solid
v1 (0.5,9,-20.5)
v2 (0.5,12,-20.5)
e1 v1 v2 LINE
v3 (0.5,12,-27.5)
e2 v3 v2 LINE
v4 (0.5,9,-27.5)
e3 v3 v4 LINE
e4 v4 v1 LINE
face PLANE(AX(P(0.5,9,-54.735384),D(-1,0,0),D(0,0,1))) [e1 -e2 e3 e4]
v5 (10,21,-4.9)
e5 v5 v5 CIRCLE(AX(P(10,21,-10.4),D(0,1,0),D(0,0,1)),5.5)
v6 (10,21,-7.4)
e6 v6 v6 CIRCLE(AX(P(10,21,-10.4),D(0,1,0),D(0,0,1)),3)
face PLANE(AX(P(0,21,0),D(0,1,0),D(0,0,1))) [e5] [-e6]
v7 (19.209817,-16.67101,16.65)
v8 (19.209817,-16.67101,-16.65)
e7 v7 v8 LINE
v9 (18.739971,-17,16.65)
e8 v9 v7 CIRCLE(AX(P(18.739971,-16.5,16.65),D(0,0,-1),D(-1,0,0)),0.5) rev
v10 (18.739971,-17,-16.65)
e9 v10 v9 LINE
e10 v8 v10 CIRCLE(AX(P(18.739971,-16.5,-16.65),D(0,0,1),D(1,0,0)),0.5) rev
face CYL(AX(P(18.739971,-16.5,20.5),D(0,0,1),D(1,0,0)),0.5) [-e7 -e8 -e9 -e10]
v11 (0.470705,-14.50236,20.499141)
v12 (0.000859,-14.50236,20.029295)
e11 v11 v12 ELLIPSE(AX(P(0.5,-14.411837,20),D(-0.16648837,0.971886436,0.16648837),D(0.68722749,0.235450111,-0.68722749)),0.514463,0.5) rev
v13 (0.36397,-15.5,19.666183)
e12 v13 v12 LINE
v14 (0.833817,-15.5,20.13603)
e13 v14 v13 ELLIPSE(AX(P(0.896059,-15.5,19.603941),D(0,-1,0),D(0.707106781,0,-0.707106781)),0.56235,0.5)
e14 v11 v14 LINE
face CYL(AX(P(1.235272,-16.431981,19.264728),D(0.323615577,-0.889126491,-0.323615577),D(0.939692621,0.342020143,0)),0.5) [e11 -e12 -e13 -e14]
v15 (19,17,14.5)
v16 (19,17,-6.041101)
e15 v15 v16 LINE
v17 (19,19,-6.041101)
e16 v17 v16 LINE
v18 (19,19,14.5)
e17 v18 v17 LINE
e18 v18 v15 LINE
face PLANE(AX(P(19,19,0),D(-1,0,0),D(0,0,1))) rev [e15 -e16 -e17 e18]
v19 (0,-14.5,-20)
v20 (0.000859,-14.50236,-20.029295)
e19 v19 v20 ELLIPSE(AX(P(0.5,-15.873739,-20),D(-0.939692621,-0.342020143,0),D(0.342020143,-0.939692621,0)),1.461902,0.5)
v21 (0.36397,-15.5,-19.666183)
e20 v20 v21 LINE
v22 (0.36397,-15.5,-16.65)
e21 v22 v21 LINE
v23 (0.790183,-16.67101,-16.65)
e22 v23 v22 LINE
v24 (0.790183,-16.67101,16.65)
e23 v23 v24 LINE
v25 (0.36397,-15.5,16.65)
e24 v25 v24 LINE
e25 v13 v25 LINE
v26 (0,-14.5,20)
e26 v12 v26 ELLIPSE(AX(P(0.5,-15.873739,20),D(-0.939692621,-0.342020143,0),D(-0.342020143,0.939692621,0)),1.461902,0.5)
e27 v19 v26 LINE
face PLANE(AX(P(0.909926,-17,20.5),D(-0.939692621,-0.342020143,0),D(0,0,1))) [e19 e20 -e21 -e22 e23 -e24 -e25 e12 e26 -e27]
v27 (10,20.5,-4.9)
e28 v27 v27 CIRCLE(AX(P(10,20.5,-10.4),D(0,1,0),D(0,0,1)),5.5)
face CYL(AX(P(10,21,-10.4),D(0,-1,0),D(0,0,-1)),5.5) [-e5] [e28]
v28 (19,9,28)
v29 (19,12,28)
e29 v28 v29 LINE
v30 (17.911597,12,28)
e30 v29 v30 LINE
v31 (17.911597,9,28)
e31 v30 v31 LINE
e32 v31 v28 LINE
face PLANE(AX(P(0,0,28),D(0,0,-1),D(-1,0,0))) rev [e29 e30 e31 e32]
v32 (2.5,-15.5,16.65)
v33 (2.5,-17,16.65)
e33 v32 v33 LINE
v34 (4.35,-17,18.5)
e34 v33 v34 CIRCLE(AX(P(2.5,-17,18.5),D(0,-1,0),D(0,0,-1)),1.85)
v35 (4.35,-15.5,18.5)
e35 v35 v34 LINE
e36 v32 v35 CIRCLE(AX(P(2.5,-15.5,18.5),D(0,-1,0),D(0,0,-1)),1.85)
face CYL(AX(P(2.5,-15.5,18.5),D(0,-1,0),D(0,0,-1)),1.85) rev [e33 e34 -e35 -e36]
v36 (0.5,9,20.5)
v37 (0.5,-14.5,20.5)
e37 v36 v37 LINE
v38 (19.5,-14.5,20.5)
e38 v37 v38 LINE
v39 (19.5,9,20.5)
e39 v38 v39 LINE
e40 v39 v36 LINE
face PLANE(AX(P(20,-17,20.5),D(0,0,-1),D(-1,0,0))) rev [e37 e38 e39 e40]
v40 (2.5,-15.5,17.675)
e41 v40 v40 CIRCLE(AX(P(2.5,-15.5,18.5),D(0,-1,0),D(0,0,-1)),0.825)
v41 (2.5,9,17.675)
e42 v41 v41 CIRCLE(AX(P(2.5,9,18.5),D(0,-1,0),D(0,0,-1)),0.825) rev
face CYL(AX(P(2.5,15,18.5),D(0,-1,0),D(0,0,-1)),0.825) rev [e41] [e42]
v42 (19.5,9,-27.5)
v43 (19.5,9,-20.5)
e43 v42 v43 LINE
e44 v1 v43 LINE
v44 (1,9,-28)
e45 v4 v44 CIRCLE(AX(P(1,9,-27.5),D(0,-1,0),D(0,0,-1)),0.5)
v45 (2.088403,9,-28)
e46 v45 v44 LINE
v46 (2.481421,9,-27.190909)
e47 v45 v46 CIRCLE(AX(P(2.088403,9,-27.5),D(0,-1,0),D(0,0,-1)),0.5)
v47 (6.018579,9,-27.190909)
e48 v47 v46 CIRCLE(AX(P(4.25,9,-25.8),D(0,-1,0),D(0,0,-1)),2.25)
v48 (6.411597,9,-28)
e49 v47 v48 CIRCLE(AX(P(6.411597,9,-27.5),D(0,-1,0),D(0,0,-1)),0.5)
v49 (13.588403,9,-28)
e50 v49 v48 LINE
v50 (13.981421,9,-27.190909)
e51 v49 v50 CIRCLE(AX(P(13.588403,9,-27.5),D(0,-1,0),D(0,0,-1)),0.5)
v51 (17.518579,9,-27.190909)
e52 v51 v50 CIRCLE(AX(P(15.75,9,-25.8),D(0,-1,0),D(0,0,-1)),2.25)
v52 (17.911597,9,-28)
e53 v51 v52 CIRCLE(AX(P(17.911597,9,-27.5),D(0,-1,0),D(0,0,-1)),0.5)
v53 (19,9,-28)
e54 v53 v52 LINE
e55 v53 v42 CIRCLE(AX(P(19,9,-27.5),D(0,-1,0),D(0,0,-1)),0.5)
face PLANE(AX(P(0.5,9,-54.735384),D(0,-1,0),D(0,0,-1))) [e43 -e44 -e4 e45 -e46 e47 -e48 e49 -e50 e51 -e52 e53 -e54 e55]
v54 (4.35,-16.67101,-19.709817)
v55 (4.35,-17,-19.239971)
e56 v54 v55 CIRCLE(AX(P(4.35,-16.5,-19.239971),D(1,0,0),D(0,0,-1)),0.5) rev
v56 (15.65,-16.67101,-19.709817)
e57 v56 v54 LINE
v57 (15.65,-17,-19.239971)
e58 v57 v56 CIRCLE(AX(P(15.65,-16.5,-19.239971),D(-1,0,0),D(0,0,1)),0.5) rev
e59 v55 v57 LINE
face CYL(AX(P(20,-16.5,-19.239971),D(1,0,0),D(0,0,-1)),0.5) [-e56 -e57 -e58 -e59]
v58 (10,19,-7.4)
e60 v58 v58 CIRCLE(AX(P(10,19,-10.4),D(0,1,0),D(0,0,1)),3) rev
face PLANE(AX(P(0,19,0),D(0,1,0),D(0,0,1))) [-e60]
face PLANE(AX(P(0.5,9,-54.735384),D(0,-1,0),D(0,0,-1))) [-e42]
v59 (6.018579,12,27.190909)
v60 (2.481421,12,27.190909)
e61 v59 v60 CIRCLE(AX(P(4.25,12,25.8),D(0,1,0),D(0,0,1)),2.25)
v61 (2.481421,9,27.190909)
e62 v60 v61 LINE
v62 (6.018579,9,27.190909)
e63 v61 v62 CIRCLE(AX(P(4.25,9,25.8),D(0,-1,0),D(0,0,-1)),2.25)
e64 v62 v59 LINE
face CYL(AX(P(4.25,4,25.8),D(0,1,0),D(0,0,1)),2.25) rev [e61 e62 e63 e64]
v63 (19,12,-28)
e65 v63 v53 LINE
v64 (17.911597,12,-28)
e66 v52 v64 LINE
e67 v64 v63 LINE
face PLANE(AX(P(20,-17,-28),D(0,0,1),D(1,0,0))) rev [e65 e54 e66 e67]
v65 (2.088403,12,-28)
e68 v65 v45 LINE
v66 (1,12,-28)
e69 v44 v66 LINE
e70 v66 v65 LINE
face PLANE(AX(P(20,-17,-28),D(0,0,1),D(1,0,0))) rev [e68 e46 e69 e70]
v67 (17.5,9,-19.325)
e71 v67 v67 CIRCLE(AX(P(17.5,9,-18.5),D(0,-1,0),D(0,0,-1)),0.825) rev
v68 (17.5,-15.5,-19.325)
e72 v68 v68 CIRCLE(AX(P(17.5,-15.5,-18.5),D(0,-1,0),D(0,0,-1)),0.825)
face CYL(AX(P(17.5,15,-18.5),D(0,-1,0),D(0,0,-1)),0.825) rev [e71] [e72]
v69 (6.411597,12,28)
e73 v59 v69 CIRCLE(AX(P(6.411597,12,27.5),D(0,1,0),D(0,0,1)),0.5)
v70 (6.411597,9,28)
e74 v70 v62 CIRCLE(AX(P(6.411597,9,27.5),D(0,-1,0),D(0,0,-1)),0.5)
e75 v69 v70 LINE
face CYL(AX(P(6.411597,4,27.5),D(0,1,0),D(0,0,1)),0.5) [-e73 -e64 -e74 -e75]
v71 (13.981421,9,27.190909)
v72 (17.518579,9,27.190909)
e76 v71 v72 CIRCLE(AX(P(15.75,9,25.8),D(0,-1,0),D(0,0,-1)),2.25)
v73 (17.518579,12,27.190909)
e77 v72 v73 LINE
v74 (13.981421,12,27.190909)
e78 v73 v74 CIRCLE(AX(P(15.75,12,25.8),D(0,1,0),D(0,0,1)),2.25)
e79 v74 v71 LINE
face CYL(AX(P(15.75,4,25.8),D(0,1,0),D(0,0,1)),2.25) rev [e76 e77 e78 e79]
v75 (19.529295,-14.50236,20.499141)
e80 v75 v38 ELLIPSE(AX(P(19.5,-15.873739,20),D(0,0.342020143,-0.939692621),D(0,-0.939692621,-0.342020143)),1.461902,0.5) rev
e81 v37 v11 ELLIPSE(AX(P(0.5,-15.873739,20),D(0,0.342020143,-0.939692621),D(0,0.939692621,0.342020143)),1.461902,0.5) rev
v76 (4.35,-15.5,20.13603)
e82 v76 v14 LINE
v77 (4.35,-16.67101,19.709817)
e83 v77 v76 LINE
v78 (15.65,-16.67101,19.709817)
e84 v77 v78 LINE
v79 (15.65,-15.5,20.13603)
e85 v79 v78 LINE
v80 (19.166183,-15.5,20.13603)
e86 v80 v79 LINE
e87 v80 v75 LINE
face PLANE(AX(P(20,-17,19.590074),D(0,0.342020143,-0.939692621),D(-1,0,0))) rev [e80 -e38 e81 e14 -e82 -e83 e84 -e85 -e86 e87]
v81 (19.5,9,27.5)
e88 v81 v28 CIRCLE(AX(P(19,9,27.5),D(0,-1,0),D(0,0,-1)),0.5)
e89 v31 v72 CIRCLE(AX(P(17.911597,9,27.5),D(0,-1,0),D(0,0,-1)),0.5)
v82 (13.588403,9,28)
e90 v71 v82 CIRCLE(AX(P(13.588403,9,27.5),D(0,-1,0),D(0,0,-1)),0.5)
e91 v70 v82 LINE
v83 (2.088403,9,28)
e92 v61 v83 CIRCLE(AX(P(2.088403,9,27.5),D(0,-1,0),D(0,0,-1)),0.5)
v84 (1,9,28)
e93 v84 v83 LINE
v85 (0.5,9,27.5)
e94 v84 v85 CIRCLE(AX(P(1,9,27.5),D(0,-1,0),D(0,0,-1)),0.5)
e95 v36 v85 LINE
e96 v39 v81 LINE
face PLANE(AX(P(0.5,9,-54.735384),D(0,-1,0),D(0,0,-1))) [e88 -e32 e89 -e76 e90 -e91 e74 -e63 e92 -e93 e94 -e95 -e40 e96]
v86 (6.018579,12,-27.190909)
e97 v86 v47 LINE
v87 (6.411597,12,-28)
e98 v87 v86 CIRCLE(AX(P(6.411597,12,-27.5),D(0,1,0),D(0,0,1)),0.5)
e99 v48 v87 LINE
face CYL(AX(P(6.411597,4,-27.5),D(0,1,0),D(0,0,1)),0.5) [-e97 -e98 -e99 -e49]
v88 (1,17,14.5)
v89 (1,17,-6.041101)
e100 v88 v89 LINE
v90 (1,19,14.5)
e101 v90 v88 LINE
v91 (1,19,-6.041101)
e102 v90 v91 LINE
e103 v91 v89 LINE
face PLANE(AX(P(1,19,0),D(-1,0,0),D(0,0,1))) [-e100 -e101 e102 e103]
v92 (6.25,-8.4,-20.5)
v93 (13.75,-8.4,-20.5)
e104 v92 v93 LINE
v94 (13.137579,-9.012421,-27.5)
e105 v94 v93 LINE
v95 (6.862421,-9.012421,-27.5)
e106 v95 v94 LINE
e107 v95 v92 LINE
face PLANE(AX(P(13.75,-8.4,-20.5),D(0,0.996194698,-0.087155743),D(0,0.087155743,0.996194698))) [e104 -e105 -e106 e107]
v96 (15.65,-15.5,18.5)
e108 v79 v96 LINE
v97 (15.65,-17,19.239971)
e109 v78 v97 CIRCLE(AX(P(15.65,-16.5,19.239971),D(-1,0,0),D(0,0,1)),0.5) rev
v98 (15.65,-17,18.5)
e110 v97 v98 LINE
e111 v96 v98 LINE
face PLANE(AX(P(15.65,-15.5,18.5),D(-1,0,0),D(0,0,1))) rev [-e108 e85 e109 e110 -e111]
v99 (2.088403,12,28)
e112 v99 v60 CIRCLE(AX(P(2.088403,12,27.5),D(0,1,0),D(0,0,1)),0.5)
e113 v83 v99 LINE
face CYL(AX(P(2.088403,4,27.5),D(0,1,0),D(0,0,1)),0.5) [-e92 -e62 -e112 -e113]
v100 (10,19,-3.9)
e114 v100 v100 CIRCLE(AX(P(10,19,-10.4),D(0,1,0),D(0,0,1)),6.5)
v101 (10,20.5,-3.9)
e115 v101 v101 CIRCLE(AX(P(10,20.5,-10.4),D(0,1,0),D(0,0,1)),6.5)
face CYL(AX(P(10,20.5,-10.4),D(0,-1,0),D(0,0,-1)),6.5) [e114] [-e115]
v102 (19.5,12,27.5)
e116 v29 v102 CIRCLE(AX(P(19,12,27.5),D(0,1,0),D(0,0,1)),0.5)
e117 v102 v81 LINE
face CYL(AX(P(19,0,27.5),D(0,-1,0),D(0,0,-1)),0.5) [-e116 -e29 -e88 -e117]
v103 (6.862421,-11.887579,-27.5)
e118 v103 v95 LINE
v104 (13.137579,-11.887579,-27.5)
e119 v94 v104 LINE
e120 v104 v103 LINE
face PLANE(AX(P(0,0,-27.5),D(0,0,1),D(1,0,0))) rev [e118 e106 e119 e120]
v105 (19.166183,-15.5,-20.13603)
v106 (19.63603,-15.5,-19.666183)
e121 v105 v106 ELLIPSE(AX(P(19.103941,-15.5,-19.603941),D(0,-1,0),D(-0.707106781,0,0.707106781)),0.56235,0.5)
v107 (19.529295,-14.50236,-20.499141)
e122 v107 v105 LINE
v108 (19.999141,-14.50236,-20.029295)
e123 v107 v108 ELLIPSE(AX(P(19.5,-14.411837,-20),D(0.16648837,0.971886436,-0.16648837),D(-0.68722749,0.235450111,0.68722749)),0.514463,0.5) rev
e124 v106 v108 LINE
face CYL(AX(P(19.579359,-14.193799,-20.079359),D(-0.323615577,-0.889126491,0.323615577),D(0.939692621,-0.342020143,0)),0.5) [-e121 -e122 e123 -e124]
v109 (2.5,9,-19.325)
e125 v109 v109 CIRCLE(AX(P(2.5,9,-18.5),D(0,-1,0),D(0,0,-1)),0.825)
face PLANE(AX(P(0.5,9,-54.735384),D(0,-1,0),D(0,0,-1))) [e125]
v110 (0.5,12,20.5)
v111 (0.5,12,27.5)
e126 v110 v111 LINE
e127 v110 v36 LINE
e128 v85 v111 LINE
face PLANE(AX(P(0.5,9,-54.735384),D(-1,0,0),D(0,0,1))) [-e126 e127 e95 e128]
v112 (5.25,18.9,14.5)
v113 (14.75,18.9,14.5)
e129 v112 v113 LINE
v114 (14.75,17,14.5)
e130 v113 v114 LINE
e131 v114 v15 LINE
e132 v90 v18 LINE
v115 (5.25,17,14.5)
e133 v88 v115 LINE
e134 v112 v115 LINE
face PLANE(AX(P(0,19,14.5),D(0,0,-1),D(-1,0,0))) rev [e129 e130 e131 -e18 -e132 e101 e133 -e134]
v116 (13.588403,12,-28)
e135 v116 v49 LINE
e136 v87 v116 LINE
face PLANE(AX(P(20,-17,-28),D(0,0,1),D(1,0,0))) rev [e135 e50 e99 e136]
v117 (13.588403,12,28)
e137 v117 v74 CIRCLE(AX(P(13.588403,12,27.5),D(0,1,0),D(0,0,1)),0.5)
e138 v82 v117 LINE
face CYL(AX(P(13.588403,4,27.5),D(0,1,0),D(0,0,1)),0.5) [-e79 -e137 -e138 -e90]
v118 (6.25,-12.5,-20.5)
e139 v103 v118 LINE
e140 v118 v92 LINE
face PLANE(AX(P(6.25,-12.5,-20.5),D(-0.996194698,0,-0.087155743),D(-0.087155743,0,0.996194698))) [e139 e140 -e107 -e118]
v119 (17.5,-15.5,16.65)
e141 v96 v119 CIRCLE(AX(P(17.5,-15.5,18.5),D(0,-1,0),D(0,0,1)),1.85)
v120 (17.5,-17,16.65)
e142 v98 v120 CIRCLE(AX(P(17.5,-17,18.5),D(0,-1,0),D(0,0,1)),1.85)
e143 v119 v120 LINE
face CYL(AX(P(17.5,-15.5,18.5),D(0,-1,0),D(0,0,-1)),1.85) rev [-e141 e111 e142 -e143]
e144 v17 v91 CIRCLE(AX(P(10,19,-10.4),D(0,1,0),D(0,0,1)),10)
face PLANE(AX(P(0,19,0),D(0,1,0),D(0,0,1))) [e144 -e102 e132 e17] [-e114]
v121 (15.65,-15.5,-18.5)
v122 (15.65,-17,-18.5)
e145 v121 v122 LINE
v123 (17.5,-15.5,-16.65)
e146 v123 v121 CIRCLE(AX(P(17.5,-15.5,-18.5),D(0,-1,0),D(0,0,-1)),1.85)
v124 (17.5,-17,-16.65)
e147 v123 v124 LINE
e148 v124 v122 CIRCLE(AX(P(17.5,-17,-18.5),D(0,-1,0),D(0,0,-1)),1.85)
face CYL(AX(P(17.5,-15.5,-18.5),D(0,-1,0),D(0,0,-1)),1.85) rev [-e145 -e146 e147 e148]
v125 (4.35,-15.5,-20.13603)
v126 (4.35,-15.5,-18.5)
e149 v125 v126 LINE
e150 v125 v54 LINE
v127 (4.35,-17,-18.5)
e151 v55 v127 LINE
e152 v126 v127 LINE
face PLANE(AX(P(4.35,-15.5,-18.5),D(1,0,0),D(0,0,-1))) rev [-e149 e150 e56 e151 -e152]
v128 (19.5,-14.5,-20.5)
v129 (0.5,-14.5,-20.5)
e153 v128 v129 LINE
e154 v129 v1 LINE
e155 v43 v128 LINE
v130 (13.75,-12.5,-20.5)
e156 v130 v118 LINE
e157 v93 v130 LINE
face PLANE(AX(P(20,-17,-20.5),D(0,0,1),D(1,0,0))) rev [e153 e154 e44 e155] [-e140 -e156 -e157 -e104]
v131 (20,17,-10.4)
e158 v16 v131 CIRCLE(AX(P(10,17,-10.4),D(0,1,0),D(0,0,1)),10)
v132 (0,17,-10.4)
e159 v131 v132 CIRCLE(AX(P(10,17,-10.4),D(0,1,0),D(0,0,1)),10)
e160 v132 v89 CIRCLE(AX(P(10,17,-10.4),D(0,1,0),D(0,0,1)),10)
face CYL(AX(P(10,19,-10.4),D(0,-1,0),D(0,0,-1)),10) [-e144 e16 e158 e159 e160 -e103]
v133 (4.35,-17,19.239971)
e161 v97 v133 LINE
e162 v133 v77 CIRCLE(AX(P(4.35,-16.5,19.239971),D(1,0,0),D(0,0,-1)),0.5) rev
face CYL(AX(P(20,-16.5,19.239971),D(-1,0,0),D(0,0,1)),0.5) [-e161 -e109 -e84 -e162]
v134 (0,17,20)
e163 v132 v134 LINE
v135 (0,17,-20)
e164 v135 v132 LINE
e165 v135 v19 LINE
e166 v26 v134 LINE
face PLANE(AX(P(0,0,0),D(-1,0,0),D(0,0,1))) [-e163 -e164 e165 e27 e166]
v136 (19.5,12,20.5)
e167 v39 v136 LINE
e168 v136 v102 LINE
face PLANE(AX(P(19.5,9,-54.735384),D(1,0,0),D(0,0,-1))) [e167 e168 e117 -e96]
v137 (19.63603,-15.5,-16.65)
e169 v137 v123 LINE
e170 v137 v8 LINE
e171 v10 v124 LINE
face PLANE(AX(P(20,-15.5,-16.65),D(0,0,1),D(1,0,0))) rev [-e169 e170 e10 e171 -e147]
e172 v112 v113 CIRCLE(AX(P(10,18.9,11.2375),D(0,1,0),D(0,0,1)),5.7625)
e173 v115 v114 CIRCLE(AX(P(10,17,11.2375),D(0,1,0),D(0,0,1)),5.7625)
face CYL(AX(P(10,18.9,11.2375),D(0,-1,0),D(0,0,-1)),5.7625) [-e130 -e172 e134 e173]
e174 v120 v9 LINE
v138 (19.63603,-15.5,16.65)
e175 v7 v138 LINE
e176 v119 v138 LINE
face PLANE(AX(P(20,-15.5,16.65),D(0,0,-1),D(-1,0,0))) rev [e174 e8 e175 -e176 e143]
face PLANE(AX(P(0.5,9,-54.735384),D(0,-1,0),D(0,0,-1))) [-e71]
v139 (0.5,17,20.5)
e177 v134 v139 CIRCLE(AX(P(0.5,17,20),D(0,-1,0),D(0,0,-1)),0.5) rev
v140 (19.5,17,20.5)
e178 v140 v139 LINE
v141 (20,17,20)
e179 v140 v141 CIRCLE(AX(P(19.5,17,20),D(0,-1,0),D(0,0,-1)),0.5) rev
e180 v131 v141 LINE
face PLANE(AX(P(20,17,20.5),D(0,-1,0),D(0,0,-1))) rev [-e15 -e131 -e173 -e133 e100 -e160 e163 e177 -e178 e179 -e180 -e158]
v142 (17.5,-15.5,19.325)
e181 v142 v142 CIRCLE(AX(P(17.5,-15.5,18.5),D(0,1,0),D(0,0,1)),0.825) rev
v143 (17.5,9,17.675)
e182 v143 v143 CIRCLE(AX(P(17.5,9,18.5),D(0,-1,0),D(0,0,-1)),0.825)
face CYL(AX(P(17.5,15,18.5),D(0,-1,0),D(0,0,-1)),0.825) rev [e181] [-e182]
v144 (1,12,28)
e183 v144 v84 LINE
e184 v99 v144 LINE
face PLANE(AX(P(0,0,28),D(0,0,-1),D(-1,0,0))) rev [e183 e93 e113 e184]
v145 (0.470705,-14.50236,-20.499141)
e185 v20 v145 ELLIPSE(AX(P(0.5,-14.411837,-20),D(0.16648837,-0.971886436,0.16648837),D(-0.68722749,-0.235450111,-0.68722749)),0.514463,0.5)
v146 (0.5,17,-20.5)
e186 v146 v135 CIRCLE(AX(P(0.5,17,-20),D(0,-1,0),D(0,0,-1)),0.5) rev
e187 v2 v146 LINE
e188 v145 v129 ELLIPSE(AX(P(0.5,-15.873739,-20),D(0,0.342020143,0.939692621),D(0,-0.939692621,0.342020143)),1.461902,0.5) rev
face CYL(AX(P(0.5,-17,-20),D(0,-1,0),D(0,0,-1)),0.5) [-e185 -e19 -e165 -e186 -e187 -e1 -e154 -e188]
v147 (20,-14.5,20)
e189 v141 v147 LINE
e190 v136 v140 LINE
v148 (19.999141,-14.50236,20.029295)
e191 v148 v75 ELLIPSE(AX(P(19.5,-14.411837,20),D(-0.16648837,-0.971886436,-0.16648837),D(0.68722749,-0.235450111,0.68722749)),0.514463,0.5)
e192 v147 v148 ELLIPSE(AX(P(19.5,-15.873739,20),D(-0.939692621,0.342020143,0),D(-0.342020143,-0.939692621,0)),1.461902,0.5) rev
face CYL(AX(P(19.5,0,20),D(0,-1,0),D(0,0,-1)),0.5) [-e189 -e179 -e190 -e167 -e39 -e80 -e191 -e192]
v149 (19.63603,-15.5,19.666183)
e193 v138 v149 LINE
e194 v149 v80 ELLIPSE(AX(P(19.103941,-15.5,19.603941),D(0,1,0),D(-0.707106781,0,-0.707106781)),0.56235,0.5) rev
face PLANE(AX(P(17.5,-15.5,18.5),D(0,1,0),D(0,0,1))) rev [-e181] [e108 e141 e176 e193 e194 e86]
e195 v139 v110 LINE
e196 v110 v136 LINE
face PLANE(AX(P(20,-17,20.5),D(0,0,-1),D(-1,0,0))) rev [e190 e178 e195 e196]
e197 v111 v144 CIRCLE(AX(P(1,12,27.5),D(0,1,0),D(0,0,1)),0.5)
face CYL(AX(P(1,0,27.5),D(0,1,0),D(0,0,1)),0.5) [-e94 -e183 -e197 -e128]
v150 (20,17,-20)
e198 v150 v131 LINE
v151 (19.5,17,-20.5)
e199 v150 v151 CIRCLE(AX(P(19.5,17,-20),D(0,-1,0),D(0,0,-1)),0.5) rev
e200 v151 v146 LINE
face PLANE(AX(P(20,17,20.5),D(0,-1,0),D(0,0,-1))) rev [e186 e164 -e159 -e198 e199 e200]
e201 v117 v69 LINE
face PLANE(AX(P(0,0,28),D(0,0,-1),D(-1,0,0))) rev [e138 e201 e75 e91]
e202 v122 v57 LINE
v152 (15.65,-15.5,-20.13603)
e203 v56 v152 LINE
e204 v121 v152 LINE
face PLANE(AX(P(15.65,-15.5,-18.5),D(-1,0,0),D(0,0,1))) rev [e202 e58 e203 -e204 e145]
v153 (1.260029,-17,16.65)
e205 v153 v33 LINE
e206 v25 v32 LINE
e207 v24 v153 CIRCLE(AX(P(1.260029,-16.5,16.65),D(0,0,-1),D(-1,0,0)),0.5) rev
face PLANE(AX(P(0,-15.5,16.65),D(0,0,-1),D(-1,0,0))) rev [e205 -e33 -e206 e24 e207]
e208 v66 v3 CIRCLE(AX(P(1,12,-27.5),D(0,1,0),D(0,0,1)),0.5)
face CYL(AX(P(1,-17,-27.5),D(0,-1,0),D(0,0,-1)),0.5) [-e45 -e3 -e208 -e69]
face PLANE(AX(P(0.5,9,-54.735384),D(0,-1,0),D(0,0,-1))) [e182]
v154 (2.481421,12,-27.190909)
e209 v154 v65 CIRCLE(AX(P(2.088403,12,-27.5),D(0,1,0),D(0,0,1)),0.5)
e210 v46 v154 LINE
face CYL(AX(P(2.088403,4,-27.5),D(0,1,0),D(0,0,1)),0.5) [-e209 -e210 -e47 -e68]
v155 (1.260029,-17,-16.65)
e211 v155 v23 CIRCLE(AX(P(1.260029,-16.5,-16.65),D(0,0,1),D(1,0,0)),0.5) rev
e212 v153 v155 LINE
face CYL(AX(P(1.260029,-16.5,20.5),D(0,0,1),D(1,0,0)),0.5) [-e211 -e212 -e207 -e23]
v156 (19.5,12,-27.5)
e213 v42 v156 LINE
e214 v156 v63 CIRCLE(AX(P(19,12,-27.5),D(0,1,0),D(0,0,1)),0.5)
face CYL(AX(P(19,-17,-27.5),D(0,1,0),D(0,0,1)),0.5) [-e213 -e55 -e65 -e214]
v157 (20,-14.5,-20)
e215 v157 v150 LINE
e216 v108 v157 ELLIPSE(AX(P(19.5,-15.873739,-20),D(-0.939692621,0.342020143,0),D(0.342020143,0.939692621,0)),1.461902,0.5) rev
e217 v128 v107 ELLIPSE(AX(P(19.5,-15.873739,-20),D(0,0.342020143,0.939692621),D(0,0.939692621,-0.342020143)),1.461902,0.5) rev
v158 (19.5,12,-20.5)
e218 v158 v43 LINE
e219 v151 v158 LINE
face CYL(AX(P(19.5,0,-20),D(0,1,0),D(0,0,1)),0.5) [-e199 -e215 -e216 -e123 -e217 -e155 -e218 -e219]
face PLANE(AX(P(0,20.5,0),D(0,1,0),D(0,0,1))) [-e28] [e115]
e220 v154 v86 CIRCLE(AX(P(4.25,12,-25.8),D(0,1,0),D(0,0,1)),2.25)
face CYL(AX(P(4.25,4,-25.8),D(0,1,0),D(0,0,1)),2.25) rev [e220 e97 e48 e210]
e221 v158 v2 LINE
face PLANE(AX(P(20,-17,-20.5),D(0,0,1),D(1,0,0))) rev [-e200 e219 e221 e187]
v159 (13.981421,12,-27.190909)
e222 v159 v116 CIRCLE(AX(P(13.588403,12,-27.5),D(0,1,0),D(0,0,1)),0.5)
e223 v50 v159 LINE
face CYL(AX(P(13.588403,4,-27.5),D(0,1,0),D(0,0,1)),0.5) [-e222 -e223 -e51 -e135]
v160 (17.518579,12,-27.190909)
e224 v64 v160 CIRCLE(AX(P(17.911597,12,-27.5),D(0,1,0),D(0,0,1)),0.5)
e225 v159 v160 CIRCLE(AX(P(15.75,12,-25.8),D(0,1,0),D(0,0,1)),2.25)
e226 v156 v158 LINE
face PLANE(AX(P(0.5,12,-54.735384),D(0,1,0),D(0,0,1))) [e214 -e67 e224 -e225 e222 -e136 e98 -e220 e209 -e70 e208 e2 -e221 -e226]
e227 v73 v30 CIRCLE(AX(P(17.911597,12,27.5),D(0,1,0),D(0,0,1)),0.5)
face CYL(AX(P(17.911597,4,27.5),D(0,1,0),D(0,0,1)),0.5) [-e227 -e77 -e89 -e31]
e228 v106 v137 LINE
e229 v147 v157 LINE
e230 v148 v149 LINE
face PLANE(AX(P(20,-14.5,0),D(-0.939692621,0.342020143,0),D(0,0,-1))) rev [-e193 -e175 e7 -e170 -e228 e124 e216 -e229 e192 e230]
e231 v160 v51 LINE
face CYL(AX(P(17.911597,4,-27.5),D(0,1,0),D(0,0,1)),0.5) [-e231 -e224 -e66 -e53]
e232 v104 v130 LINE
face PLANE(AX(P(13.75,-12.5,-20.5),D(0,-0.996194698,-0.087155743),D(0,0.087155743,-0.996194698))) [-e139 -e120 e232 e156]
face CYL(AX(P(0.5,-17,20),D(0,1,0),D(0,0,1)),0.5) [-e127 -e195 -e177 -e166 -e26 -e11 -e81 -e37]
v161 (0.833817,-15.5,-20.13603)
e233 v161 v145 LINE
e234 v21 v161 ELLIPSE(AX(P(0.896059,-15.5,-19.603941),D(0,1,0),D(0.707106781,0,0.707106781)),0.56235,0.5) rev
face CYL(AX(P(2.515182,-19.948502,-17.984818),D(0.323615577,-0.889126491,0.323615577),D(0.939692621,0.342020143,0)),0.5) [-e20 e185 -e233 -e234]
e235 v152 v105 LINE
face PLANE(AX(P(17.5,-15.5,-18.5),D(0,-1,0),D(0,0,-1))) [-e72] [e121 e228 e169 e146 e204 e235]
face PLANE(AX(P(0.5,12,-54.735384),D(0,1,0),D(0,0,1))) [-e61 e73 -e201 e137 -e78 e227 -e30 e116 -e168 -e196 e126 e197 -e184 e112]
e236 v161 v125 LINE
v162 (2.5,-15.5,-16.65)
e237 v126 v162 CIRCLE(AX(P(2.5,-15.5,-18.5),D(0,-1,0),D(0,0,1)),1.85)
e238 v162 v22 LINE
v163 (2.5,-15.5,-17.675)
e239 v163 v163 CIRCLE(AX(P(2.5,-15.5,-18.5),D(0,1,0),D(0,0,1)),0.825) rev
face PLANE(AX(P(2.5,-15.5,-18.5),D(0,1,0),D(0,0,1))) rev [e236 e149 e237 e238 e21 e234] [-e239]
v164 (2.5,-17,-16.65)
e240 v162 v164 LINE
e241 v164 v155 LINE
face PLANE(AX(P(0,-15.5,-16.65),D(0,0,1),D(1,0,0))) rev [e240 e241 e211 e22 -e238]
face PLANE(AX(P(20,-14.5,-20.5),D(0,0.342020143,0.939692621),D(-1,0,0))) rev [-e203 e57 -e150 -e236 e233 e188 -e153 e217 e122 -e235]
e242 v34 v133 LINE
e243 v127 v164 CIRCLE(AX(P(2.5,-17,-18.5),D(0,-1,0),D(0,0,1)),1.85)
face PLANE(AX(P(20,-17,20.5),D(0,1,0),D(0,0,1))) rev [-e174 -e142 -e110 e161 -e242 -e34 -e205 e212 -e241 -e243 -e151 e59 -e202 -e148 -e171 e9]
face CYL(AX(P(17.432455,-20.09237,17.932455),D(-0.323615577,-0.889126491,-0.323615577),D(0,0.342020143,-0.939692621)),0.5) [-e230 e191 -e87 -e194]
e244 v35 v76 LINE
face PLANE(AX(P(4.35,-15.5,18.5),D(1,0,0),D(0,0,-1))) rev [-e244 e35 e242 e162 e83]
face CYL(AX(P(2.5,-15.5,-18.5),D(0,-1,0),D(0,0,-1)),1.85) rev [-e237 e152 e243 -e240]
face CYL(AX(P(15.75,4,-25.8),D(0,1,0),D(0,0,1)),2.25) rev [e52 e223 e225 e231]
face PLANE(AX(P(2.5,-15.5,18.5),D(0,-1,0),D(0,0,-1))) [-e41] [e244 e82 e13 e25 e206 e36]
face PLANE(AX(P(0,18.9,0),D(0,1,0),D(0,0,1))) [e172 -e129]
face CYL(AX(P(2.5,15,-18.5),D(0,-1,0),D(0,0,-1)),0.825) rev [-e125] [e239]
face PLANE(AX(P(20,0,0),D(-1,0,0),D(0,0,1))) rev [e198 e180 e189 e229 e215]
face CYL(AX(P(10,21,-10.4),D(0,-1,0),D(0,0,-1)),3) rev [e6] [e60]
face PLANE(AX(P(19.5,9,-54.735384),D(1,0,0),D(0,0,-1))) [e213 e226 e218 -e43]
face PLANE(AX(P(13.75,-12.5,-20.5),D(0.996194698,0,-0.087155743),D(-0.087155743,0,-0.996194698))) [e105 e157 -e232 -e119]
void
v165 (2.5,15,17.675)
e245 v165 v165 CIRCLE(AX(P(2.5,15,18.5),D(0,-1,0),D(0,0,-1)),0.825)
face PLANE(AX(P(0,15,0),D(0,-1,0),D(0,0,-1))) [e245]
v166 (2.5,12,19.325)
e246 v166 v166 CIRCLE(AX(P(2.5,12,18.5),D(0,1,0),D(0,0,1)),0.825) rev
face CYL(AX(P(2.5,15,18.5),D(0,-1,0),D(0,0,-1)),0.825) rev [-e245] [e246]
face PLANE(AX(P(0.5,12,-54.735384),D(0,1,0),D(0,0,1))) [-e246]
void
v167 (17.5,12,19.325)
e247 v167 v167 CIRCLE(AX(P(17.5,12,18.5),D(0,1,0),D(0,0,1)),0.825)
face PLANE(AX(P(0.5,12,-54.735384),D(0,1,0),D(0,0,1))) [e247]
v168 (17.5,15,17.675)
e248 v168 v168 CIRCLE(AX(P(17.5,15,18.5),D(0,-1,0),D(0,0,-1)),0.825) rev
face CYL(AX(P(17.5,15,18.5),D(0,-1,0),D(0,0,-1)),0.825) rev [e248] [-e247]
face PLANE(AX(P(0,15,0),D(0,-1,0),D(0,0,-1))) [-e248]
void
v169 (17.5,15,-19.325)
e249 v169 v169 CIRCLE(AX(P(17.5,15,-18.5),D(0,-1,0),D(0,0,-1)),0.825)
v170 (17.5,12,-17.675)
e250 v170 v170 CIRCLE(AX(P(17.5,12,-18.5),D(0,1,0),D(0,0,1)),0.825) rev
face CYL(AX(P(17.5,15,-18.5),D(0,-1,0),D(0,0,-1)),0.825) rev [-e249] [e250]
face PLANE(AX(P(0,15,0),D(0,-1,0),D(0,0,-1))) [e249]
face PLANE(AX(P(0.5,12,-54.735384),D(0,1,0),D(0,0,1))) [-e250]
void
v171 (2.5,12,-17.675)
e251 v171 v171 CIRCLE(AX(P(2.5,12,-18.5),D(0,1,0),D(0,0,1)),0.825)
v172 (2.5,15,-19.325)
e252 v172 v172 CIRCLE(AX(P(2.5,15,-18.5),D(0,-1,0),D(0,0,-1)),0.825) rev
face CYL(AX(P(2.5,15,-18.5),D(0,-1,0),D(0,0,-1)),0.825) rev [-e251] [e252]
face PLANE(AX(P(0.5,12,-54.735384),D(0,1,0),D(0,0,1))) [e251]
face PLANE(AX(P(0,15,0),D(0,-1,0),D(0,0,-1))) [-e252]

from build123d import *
from build123d.topology import SkipClean

# Parameters (mm, degrees)
SKETCH1_W                 = 41
SKETCH1_H                 = 34
BOSS_EXTRUDE1_DEPTH       = 20
BOSS_EXTRUDE2_DEPTH       = 2
BOSS_EXTRUDE3_DEPTH       = 1.9
SKETCH3_R                 = 6.5
SKETCH3_R_2               = 5.5
BOSS_EXTRUDE4_DEPTH       = 1.5
SKETCH3_3_R               = 5.5
SKETCH3_3_R_2             = 3
BOSS_EXTRUDE5_DEPTH       = 2
SKETCH10_R                = 0.825
CUT_EXTRUDE3_DEPTH        = 1.5
SKETCH10_10_R             = 0.825
CUT_EXTRUDE4_DEPTH        = 32
CHAMFER2_SIZE             = 2.5
CHAMFER2_SIZE2            = 0.909925586
CHAMFER2_PART_2_SIZE      = 2.5
CHAMFER2_PART_2_SIZE2     = 0.909925586
CHAMFER2_PART_3_SIZE      = 2.5
CHAMFER2_PART_3_SIZE2     = 0.909925586
CHAMFER2_PART_4_SIZE      = 2.5
CHAMFER2_PART_4_SIZE2     = 0.909925586
FILLET2_R                 = 0.5
SKETCH11_W                = 7.5
SKETCH11_H                = 4.1
BOSS_EXTRUDE10_DEPTH      = 7
BOSS_EXTRUDE10_TAPER      = 5
BOSS_EXTRUDE11_DEPTH      = 7.5
BOSS_EXTRUDE11_DEPTH_BACK = 48.5
SKETCH13_W                = 19
SKETCH13_H                = 3
SKETCH14_R                = 2.25
CUT_EXTRUDE5_DEPTH        = 8
FILLET3_R                 = 0.5
FILLET4_R                 = 0.5


with BuildPart() as part:
    # Sketch1 → Boss-Extrude1 (new body)
    with BuildSketch(Plane(origin=(0, 0, 0), x_dir=(0, 0, -1), z_dir=(1, 0, 0))):
        Rectangle(SKETCH1_W, SKETCH1_H)
    extrude(amount=BOSS_EXTRUDE1_DEPTH)

    # Sketch2 → Boss-Extrude2 (add)
    with BuildSketch(Plane(origin=(0, 17, 0), x_dir=(1, 0, 0), z_dir=(0, 1, 0))):
        with BuildLine():
            ThreePointArc((20, 10.4), (7.763932023, 20.146794345), (1, 6.041101056))
            Line((1, 6.041101056), (1, 10.5))
            Line((1, 10.5), (19, 10.5))
            Line((19, 10.5), (19, 6.041101056))
            ThreePointArc((19, 6.041101056), (19.746794345, 8.163932022), (20, 10.4))
        make_face()
        with BuildLine():
            Line((1, 10.5), (1, 6.041101056))
            ThreePointArc((1, 6.041101056), (10, 0.4), (19, 6.041101056))
            Line((19, 6.041101056), (19, 10.5))
            Line((19, 10.5), (1, 10.5))
        make_face()
        with BuildLine():
            Line((1, 6.041101056), (1, -14.5))
            Line((1, -14.5), (5.25, -14.5))
            Line((5.25, -14.5), (14.75, -14.5))
            Line((14.75, -14.5), (19, -14.5))
            Line((19, -14.5), (19, 6.041101056))
            ThreePointArc((19, 6.041101056), (10, 0.4), (1, 6.041101056))
        make_face()
    extrude(amount=BOSS_EXTRUDE2_DEPTH)

    # Sketch2<3> → Boss-Extrude3 (add)
    with BuildSketch(Plane(origin=(0, 17, 0), x_dir=(1, 0, 0), z_dir=(0, 1, 0))):
        with BuildLine():
            Line((14.75, -14.5), (5.25, -14.5))
            ThreePointArc((5.25, -14.5), (10, -17), (14.75, -14.5))
        make_face()
    extrude(amount=BOSS_EXTRUDE3_DEPTH)

    # Sketch3 → Boss-Extrude4 (add)
    with BuildSketch(Plane(origin=(0, 19, 0), x_dir=(1, 0, 0), z_dir=(0, 1, 0))):
        with Locations(Location((10, 10.4, 0), (0, 0, 270))):
            Circle(SKETCH3_R)
        with Locations(Location((10, 10.4, 0), (0, 0, 270))):
            Circle(SKETCH3_R_2, mode=Mode.SUBTRACT)
    extrude(amount=BOSS_EXTRUDE4_DEPTH)

    # Sketch3<3> → Boss-Extrude5 (add)
    with BuildSketch(Plane(origin=(0, 19, 0), x_dir=(1, 0, 0), z_dir=(0, 1, 0))):
        with Locations(Location((10, 10.4, 0), (0, 0, 270))):
            Circle(SKETCH3_3_R)
        with Locations(Location((10, 10.4, 0), (0, 0, 270))):
            Circle(SKETCH3_3_R_2, mode=Mode.SUBTRACT)
    extrude(amount=BOSS_EXTRUDE5_DEPTH)

    # Sketch10 → Cut-Extrude3 (cut)
    # profile 1 of 4: a face of its own
    with BuildSketch(Plane.XZ.offset(17)):
        with BuildLine():
            Line((0, 16.65), (2.5, 16.65))
            ThreePointArc((2.5, 16.65), (3.808147545, 17.191852455), (4.35, 18.5))
            Line((4.35, 18.5), (4.35, 20.5))
            Line((4.35, 20.5), (0, 20.5))
            Line((0, 20.5), (0, 16.65))
        make_face()
        with Locations(Location((2.5, 18.5, 0), (0, 0, 270))):
            Circle(SKETCH10_R, mode=Mode.SUBTRACT)
    # profile 2 of 4: a face of its own
    with BuildSketch(Plane.XZ.offset(17)):
        with BuildLine():
            Line((15.65, 18.5), (15.65, 20.5))
            Line((15.65, 20.5), (20, 20.5))
            Line((20, 20.5), (20, 16.65))
            Line((20, 16.65), (17.5, 16.65))
            ThreePointArc((17.5, 16.65), (16.191852455, 17.191852455), (15.65, 18.5))
        make_face()
        with Locations(Location((17.5, 18.5, 0), (0, 0, 90))):
            Circle(SKETCH10_R, mode=Mode.SUBTRACT)
    # profile 3 of 4: a face of its own
    with BuildSketch(Plane.XZ.offset(17)):
        with BuildLine():
            Line((4.35, -18.5), (4.35, -20.5))
            Line((4.35, -20.5), (0, -20.5))
            Line((0, -20.5), (0, -16.65))
            Line((0, -16.65), (2.5, -16.65))
            ThreePointArc((2.5, -16.65), (3.808147545, -17.191852455), (4.35, -18.5))
        make_face()
        with Locations(Location((2.5, -18.5, 0), (0, 0, 90))):
            Circle(SKETCH10_R, mode=Mode.SUBTRACT)
    # profile 4 of 4: a face of its own
    with BuildSketch(Plane.XZ.offset(17)):
        with BuildLine():
            Line((20, -16.65), (17.5, -16.65))
            ThreePointArc((17.5, -16.65), (16.191852455, -17.191852455), (15.65, -18.5))
            Line((15.65, -18.5), (15.65, -20.5))
            Line((15.65, -20.5), (20, -20.5))
            Line((20, -20.5), (20, -16.65))
        make_face()
        with Locations(Location((17.5, -18.5, 0), (0, 0, 270))):
            Circle(SKETCH10_R, mode=Mode.SUBTRACT)
    extrude(amount=-CUT_EXTRUDE3_DEPTH, mode=Mode.SUBTRACT)

    # Sketch10<10> → Cut-Extrude4 (cut)
    with BuildSketch(Plane.XZ.offset(17)):
        with Locations(Location((2.5, 18.5, 0), (0, 0, 270))):
            Circle(SKETCH10_10_R)
        with Locations(Location((17.5, 18.5, 0), (0, 0, 270))):
            Circle(SKETCH10_10_R)
        with Locations(Location((17.5, -18.5, 0), (0, 0, 270))):
            Circle(SKETCH10_10_R)
        with Locations(Location((2.5, -18.5, 0), (0, 0, 270))):
            Circle(SKETCH10_10_R)
    extrude(amount=-CUT_EXTRUDE4_DEPTH, mode=Mode.SUBTRACT)

    # Chamfer2
    chamfer2_edges = [part.edges().sort_by_distance(p)[0] for p in [
        (10, -17, 20.5),
    ]]
    chamfer2_side = [part.faces().sort_by_distance(p)[0] for p in [
        (10, 0.317958618, 20.5),
    ]]
    chamfer(chamfer2_edges, length=CHAMFER2_SIZE, length2=CHAMFER2_SIZE2, reference=chamfer2_side[0])

    # Chamfer2 part 2
    chamfer2_part_2_edges = [part.edges().sort_by_distance(p)[0] for p in [
        (20, -17, 0),
    ]]
    chamfer2_part_2_side = [part.faces().sort_by_distance(p)[0] for p in [
        (20, 0.135764404, 0),
    ]]
    chamfer(chamfer2_part_2_edges, length=CHAMFER2_PART_2_SIZE, length2=CHAMFER2_PART_2_SIZE2, reference=chamfer2_part_2_side[0])

    # Chamfer2 part 3
    chamfer2_part_3_edges = [part.edges().sort_by_distance(p)[0] for p in [
        (10, -17, -20.5),
    ]]
    chamfer2_part_3_side = [part.faces().sort_by_distance(p)[0] for p in [
        (10, 0.317958618, -20.5),
    ]]
    chamfer(chamfer2_part_3_edges, length=CHAMFER2_PART_3_SIZE, length2=CHAMFER2_PART_3_SIZE2, reference=chamfer2_part_3_side[0])

    # Chamfer2 part 4
    chamfer2_part_4_edges = [part.edges().sort_by_distance(p)[0] for p in [
        (0, -17, 0),
    ]]
    chamfer2_part_4_side = [part.faces().sort_by_distance(p)[0] for p in [
        (0, 0.135764404, 0),
    ]]
    chamfer(chamfer2_part_4_edges, length=CHAMFER2_PART_4_SIZE, length2=CHAMFER2_PART_4_SIZE2, reference=chamfer2_part_4_side[0])

    # Fillet2
    # the kernel refuses this fillet: 0.5 mm, written as the material it takes off along each edge
    with BuildSketch(Plane(origin=(20, 18.25, 20.5), x_dir=(-1, 0, 0), z_dir=(0, -1, 0)), Plane(origin=(0, -15.75, -20.5), x_dir=(0, 0, 1), z_dir=(0, 1, 0)), Plane(origin=(20, -15.75, -20.5), x_dir=(-1, 0, 0), z_dir=(0, 1, 0)), Plane(origin=(0, 18.25, 20.5), x_dir=(0, 0, -1), z_dir=(0, -1, 0))) as fillet2_piece_1:
        with BuildLine():
            CenterArc((FILLET2_R, FILLET2_R), FILLET2_R, 180, 90)
            Line((0, FILLET2_R), (0, 0))
            Line((0, 0), (FILLET2_R, 0))
        make_face()
    extrude(amount=34, mode=Mode.SUBTRACT)
    with BuildSketch(Plane(origin=(19.090074414, -17, 17.525259423), x_dir=(-1, 0, 0), z_dir=(0, 0, -1))) as fillet2_piece_2:
        with BuildLine():
            CenterArc((FILLET2_R * 0.70020753821, FILLET2_R), FILLET2_R, 200, 70)
            Line((-FILLET2_R * 0.239485082576, FILLET2_R * 0.657979856674), (0, 0))
            Line((0, 0), (FILLET2_R * 0.70020753821, 0))
        make_face()
    extrude(amount=35.050518846, mode=Mode.SUBTRACT)
    with BuildSketch(Plane(origin=(3.474740577, -17, 19.590074414), x_dir=(0, 0, -1), z_dir=(1, 0, 0))) as fillet2_piece_3:
        with BuildLine():
            CenterArc((FILLET2_R * 0.70020753821, FILLET2_R), FILLET2_R, 200, 70)
            Line((-FILLET2_R * 0.239485082576, FILLET2_R * 0.657979856674), (0, 0))
            Line((0, 0), (FILLET2_R * 0.70020753821, 0))
        make_face()
    extrude(amount=13.050518846, mode=Mode.SUBTRACT)
    with BuildSketch(Plane(origin=(0.909925586, -17, 17.525259423), x_dir=(1, 0, 0), z_dir=(0, 0, -1))) as fillet2_piece_4:
        with BuildLine():
            CenterArc((FILLET2_R * 0.70020753821, -FILLET2_R), FILLET2_R, 90, 70)
            Line((-FILLET2_R * 0.239485082576, -FILLET2_R * 0.657979856674), (0, 0))
            Line((0, 0), (FILLET2_R * 0.70020753821, 0))
        make_face()
    extrude(amount=35.050518846, mode=Mode.SUBTRACT)
    with BuildSketch(Plane(origin=(3.474740577, -17, -19.590074414), x_dir=(0, 0, 1), z_dir=(1, 0, 0))) as fillet2_piece_5:
        with BuildLine():
            CenterArc((FILLET2_R * 0.70020753821, -FILLET2_R), FILLET2_R, 90, 70)
            Line((-FILLET2_R * 0.239485082576, -FILLET2_R * 0.657979856674), (0, 0))
            Line((0, 0), (FILLET2_R * 0.70020753821, 0))
        make_face()
    extrude(amount=13.050518846, mode=Mode.SUBTRACT)
    with BuildSketch(Plane(origin=(20.359668978, -13.511817604, 20.859668978), x_dir=(-0.9461886483394651, 0.3040991697893314, 0.1106830460683821), z_dir=(-0.3236155771181854, -0.8891264907159879, -0.3236155771181854)), Plane(origin=(-0.359668978, -13.511817604, 20.859668978), x_dir=(-0.1106830460683816, 0.3040991697893315, -0.946188648339465), z_dir=(0.3236155771181852, -0.8891264907159879, -0.32361557711818534))) as fillet2_piece_6:
        with BuildLine():
            CenterArc((FILLET2_R * 0.889126490716, FILLET2_R), FILLET2_R, 186.717713464, 83.282286536)
            Line((-FILLET2_R * 0.104008041637, FILLET2_R * 0.883022221559), (0, 0))
            Line((0, 0), (FILLET2_R * 0.889126490716, 0))
        make_face()
    extrude(amount=3.347515592, mode=Mode.SUBTRACT)
    with BuildSketch(Plane(origin=(20.359668978, -13.511817604, -20.859668978), x_dir=(-0.9461886483394651, 0.3040991697893314, -0.1106830460683821), z_dir=(-0.3236155771181854, -0.8891264907159879, 0.3236155771181854)), Plane(origin=(-0.359668978, -13.511817604, -20.859668978), x_dir=(-0.11068304606838075, 0.3040991697893318, 0.9461886483394651), z_dir=(0.3236155771181852, -0.8891264907159879, 0.32361557711818534))) as fillet2_piece_7:
        with BuildLine():
            CenterArc((FILLET2_R * 0.889126490716, -FILLET2_R), FILLET2_R, 90, 83.282286536)
            Line((-FILLET2_R * 0.104008041637, -FILLET2_R * 0.883022221559), (0, 0))
            Line((0, 0), (FILLET2_R * 0.889126490716, 0))
        make_face()
    extrude(amount=3.347515592, mode=Mode.SUBTRACT)

    # Sketch11 → Boss-Extrude10 (add)
    with BuildSketch(Plane(origin=(0, 0, -20.5), x_dir=(-1, 0, 0), z_dir=(0, 0, -1))):
        with Locations((-10, -10.45)):
            Rectangle(SKETCH11_W, SKETCH11_H)
    extrude(amount=BOSS_EXTRUDE10_DEPTH, taper=BOSS_EXTRUDE10_TAPER)

    # Sketch13 → Boss-Extrude11 (add, two sides: drawn at the far end of the back side and taken through both)
    with BuildSketch(Plane.XY.offset(20.5).offset(-BOSS_EXTRUDE11_DEPTH_BACK)):
        with Locations((10, 10.5)):
            Rectangle(SKETCH13_W, SKETCH13_H)
    extrude(amount=BOSS_EXTRUDE11_DEPTH + BOSS_EXTRUDE11_DEPTH_BACK)

    # Sketch14 → Cut-Extrude5 (cut)
    with SkipClean():  # the faces are left unmerged after this step: merging them gives an invalid solid
        with BuildSketch(Plane(origin=(0, 12, 0), x_dir=(1, 0, 0), z_dir=(0, 1, 0))):
            with Locations((15.75, -25.8)):
                Circle(SKETCH14_R)
            with Locations((4.25, -25.8)):
                Circle(SKETCH14_R)
            with Locations((15.75, 25.8)):
                Circle(SKETCH14_R)
            with Locations((4.25, 25.8)):
                Circle(SKETCH14_R)
        extrude(amount=-CUT_EXTRUDE5_DEPTH, mode=Mode.SUBTRACT)

    # Fillet3
    fillet3_edges = [part.edges().sort_by_distance(p)[0] for p in [
        (15.278300943, 10.5, 28),
        (16.221699057, 10.5, 28),
        (3.778300943, 10.5, 28),
        (4.721699057, 10.5, 28),
        (16.221699057, 10.5, -28),
        (15.278300943, 10.5, -28),
        (4.721699057, 10.5, -28),
        (3.778300943, 10.5, -28),
    ]]
    fillet(fillet3_edges, radius=FILLET3_R)

    # Fillet4
    fillet4_edges = [part.edges().sort_by_distance(p)[0] for p in [
        (0.5, 10.5, -28),
        (19.5, 10.5, -28),
        (0.5, 10.5, 28),
        (19.5, 10.5, 28),
    ]]
    fillet(fillet4_edges, radius=FILLET4_R)


solid = part.part
